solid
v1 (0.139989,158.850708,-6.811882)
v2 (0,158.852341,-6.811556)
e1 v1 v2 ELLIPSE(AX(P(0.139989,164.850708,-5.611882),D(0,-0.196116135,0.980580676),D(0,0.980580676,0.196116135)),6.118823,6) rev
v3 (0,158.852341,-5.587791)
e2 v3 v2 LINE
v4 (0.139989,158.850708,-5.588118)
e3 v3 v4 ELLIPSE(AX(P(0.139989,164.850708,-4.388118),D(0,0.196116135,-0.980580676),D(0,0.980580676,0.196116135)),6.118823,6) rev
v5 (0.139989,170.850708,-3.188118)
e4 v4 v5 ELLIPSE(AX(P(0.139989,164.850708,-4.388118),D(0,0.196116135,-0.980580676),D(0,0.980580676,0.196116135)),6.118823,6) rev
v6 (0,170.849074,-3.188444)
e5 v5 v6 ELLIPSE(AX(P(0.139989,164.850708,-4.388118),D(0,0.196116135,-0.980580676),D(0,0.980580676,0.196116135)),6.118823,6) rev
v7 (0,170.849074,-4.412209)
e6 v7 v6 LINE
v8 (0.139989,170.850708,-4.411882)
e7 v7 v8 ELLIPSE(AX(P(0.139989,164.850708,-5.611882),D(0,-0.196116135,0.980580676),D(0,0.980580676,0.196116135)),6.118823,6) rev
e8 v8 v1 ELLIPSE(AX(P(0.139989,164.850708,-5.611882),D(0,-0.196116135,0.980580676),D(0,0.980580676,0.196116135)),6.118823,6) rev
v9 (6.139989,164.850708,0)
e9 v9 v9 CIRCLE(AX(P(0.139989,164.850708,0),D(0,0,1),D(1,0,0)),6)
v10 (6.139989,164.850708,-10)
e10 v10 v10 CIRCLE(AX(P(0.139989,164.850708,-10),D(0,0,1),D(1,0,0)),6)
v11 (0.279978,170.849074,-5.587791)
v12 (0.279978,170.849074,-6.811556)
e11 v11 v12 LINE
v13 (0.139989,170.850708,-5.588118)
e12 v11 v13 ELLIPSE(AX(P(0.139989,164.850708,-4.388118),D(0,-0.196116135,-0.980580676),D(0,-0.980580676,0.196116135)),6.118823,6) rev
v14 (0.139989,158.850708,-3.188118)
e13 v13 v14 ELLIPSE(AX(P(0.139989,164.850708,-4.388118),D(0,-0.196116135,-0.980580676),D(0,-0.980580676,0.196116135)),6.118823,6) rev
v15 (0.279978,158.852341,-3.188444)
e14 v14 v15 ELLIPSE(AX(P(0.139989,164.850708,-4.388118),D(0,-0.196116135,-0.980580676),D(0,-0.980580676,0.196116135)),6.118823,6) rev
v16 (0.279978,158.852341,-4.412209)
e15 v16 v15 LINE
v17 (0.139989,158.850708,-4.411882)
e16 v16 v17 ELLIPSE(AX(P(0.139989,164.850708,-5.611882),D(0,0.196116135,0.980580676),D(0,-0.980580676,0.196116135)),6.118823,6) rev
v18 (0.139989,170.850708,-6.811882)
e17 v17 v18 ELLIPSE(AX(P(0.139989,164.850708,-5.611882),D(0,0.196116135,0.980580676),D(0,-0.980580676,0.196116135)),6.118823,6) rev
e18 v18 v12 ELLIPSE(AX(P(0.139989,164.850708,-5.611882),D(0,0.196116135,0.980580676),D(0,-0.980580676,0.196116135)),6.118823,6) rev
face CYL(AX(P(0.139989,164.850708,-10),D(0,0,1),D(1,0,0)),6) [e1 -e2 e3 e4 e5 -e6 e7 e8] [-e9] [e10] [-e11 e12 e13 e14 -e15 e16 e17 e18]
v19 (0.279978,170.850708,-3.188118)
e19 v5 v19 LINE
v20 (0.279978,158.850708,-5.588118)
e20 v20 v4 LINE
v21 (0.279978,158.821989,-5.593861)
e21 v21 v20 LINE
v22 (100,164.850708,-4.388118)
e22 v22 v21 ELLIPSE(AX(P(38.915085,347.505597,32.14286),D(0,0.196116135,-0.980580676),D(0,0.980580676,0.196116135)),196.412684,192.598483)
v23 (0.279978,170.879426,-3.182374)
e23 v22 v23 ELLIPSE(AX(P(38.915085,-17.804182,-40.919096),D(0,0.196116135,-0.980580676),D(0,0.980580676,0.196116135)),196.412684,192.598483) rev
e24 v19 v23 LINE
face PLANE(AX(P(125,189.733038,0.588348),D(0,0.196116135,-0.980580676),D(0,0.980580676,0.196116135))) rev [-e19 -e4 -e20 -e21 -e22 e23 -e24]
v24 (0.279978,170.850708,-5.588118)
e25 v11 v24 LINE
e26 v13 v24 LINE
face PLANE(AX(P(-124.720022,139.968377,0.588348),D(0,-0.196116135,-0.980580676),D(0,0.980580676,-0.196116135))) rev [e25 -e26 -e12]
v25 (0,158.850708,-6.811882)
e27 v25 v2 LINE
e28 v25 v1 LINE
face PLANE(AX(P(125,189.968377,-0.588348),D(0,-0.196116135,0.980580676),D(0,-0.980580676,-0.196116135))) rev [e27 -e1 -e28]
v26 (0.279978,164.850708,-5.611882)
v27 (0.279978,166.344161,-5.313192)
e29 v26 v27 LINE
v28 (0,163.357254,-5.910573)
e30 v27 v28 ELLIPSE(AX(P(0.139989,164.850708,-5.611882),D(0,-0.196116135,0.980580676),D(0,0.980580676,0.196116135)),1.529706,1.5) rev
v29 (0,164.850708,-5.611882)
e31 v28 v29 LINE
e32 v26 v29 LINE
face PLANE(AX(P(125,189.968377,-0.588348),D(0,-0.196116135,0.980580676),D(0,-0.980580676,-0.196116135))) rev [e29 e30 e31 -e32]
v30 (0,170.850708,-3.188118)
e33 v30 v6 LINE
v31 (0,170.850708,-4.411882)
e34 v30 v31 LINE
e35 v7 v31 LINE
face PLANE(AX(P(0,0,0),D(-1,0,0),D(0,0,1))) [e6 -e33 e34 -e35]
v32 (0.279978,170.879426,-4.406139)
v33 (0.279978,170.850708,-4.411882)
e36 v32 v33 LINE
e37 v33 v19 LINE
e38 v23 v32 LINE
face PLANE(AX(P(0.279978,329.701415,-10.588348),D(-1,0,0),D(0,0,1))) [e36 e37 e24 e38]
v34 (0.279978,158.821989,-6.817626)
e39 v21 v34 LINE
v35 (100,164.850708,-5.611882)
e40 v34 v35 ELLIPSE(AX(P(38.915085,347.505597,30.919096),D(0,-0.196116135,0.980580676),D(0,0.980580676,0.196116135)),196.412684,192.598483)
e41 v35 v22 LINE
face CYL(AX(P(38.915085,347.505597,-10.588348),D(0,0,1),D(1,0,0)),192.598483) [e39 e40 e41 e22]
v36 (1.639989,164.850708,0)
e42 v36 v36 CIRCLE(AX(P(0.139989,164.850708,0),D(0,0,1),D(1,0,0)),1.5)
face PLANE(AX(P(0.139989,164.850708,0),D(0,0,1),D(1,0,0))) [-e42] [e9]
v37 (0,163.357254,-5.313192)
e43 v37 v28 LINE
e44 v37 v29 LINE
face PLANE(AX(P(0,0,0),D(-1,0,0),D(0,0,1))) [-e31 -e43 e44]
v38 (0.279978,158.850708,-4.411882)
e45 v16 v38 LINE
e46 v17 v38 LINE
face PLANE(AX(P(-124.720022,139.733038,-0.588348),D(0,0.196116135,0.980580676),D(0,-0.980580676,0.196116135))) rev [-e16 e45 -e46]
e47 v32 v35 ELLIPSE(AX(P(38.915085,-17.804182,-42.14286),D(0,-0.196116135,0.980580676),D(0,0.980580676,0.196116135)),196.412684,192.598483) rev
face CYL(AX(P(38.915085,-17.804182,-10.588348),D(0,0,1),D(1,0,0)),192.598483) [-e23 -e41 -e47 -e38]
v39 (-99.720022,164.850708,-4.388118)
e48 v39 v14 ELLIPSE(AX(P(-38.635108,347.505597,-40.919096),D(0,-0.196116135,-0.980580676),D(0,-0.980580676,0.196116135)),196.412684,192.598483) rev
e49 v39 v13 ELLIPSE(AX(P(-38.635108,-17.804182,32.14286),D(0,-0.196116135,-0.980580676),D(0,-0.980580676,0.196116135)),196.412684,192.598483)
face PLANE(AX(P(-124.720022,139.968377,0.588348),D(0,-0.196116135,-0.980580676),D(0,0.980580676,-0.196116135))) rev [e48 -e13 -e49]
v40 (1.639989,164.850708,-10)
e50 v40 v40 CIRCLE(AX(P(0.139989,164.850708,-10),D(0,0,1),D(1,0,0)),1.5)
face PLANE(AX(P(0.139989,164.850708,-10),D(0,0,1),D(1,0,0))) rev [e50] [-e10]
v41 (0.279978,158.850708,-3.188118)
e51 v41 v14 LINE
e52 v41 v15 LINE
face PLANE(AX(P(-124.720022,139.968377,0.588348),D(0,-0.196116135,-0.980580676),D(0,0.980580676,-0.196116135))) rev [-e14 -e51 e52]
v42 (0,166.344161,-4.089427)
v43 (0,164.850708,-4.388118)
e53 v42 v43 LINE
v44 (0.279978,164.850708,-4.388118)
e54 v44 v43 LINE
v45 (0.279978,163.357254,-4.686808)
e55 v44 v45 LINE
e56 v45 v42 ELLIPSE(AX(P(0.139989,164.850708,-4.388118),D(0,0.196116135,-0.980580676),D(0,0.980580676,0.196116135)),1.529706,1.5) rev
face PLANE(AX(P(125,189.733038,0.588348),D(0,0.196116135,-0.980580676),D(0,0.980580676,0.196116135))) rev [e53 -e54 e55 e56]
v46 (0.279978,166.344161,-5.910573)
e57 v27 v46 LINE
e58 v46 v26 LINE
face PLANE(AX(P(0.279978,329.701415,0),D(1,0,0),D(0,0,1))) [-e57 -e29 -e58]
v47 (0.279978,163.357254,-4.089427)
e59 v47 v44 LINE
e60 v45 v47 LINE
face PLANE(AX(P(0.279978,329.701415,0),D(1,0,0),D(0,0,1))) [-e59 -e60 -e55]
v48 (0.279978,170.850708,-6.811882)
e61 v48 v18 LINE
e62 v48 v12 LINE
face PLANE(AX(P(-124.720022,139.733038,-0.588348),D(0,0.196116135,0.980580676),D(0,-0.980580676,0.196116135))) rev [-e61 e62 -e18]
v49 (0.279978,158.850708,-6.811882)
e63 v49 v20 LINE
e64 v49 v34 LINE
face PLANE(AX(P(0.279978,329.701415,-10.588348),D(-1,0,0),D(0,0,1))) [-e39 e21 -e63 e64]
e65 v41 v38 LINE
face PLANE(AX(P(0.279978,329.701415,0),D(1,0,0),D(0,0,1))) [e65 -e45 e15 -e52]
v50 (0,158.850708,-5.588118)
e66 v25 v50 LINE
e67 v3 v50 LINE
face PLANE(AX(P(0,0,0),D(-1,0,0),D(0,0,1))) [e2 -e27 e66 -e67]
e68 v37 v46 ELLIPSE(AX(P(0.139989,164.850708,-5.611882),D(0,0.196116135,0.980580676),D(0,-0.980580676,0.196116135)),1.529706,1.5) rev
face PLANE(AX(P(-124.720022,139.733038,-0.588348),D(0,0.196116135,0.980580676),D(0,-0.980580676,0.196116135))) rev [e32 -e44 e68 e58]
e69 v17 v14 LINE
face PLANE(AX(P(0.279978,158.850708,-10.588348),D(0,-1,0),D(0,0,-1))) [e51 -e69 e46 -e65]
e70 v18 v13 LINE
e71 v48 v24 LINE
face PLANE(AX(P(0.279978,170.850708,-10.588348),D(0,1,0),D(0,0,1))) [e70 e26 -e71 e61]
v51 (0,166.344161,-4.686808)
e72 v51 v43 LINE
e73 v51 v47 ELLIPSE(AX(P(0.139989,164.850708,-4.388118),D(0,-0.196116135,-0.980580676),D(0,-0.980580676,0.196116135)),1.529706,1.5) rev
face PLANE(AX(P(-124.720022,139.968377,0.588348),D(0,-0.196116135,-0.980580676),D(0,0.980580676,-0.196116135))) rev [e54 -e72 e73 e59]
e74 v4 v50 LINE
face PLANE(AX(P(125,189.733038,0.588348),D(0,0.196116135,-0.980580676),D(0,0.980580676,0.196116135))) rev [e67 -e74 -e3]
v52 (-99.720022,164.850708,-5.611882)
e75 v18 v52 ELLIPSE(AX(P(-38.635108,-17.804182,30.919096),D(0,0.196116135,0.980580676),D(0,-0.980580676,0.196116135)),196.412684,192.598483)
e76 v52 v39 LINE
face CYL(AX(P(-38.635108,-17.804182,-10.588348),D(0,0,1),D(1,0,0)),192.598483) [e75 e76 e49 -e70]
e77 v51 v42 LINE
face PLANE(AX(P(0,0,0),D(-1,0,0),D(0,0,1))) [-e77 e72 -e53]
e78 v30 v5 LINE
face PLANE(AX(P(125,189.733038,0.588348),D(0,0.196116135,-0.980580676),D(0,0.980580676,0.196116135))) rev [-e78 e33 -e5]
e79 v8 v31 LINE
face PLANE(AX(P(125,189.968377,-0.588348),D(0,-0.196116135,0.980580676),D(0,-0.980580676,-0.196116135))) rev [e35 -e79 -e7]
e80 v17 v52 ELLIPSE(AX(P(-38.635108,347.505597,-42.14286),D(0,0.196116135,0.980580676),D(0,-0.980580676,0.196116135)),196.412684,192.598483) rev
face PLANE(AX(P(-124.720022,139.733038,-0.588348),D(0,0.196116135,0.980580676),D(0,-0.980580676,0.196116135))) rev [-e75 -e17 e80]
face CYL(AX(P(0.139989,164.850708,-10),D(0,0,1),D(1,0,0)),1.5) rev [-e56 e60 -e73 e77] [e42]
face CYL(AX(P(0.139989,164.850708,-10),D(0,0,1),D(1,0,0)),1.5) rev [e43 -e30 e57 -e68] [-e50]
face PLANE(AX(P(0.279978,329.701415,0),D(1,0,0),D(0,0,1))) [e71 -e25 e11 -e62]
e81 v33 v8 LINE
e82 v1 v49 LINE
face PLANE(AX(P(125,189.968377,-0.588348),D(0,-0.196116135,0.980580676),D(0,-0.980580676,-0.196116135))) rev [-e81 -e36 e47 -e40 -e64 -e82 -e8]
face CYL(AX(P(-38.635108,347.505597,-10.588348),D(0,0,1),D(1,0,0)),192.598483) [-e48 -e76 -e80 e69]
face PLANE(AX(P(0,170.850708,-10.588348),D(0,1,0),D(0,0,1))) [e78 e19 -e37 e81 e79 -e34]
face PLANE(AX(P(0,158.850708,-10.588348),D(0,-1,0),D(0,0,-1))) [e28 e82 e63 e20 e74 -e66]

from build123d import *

# Parameters (mm, degrees)
SKETCH1_R           = 6.000000000000002
SKETCH1_R_2         = 1.4999999999999918
BOSS_EXTRUDE1_DEPTH = 10
BOSS_EXTRUDE2_DEPTH = 125
CUT_EXTRUDE1_START  = -10.588348405
CUT_EXTRUDE1_DEPTH  = 11.17669681
CIRPATTERN1_COUNT   = 2


# Read off the part's stored shape, not the designer's step: Cut-Extrude1
with BuildPart() as part:
    # Sketch1 → Boss-Extrude1 (new body)
    with BuildSketch(Plane.XY):
        with Locations((0.1399887701091363, 164.8507075610879)):
            Circle(SKETCH1_R)
        with Locations((0.1399887701091363, 164.8507075610879)):
            Circle(SKETCH1_R_2, mode=Mode.SUBTRACT)
    extrude(amount=-BOSS_EXTRUDE1_DEPTH)

    # Sketch2 → Boss-Extrude2 (add)
    with BuildSketch(Plane(origin=(0, 0, 0), x_dir=(0, 0, -1), z_dir=(1, 0, 0))):
        Polygon((-0.5883484054145544, 189.73303788000499), (9.411651594585447, 139.73303788000499), (10.58834840541455, 139.9683772421708), (0.5883484054145496, 189.9683772421708), align=None)
    boss_extrude2 = extrude(amount=BOSS_EXTRUDE2_DEPTH)

    # Cut-Extrude1 outline → Cut-Extrude1 (cut)
    with BuildSketch(Plane.XY.offset(CUT_EXTRUDE1_START)):
        with BuildLine():
            Line((0, 170.850707561), (0.13998877, 170.850707561))
            ThreePointArc((0.13998877, 170.850707561), (50.466362146, 174.447589067), (100, 164.850707561))
            ThreePointArc((100, 164.850707561), (50.466362146, 155.253826055), (0.13998877, 158.850707561))
            Line((0.13998877, 158.850707561), (0, 158.850707561))
            Line((0, 158.850707561), (0, 131.123594735))
            Line((0, 131.123594735), (135.475544018, 131.123594735))
            Line((135.475544018, 131.123594735), (135.475544018, 197.042094646))
            Line((135.475544018, 197.042094646), (0, 197.042094646))
            Line((0, 197.042094646), (0, 170.850707561))
        make_face()
    cut_extrude1 = extrude(amount=CUT_EXTRUDE1_DEPTH, mode=Mode.SUBTRACT)

    # CirPattern1: Boss-Extrude2, Cut-Extrude1 ×2 about axis
    cirpattern1_axis = Axis((0.1399887701089445, 164.85070756108797, 0), (0, 0, 1))
    add([boss_extrude2.rotate(cirpattern1_axis, i * 360 / CIRPATTERN1_COUNT) for i in range(1, CIRPATTERN1_COUNT)])
    add([cut_extrude1.rotate(cirpattern1_axis, i * 360 / CIRPATTERN1_COUNT) for i in range(1, CIRPATTERN1_COUNT)], mode=Mode.SUBTRACT)


solid = part.part
